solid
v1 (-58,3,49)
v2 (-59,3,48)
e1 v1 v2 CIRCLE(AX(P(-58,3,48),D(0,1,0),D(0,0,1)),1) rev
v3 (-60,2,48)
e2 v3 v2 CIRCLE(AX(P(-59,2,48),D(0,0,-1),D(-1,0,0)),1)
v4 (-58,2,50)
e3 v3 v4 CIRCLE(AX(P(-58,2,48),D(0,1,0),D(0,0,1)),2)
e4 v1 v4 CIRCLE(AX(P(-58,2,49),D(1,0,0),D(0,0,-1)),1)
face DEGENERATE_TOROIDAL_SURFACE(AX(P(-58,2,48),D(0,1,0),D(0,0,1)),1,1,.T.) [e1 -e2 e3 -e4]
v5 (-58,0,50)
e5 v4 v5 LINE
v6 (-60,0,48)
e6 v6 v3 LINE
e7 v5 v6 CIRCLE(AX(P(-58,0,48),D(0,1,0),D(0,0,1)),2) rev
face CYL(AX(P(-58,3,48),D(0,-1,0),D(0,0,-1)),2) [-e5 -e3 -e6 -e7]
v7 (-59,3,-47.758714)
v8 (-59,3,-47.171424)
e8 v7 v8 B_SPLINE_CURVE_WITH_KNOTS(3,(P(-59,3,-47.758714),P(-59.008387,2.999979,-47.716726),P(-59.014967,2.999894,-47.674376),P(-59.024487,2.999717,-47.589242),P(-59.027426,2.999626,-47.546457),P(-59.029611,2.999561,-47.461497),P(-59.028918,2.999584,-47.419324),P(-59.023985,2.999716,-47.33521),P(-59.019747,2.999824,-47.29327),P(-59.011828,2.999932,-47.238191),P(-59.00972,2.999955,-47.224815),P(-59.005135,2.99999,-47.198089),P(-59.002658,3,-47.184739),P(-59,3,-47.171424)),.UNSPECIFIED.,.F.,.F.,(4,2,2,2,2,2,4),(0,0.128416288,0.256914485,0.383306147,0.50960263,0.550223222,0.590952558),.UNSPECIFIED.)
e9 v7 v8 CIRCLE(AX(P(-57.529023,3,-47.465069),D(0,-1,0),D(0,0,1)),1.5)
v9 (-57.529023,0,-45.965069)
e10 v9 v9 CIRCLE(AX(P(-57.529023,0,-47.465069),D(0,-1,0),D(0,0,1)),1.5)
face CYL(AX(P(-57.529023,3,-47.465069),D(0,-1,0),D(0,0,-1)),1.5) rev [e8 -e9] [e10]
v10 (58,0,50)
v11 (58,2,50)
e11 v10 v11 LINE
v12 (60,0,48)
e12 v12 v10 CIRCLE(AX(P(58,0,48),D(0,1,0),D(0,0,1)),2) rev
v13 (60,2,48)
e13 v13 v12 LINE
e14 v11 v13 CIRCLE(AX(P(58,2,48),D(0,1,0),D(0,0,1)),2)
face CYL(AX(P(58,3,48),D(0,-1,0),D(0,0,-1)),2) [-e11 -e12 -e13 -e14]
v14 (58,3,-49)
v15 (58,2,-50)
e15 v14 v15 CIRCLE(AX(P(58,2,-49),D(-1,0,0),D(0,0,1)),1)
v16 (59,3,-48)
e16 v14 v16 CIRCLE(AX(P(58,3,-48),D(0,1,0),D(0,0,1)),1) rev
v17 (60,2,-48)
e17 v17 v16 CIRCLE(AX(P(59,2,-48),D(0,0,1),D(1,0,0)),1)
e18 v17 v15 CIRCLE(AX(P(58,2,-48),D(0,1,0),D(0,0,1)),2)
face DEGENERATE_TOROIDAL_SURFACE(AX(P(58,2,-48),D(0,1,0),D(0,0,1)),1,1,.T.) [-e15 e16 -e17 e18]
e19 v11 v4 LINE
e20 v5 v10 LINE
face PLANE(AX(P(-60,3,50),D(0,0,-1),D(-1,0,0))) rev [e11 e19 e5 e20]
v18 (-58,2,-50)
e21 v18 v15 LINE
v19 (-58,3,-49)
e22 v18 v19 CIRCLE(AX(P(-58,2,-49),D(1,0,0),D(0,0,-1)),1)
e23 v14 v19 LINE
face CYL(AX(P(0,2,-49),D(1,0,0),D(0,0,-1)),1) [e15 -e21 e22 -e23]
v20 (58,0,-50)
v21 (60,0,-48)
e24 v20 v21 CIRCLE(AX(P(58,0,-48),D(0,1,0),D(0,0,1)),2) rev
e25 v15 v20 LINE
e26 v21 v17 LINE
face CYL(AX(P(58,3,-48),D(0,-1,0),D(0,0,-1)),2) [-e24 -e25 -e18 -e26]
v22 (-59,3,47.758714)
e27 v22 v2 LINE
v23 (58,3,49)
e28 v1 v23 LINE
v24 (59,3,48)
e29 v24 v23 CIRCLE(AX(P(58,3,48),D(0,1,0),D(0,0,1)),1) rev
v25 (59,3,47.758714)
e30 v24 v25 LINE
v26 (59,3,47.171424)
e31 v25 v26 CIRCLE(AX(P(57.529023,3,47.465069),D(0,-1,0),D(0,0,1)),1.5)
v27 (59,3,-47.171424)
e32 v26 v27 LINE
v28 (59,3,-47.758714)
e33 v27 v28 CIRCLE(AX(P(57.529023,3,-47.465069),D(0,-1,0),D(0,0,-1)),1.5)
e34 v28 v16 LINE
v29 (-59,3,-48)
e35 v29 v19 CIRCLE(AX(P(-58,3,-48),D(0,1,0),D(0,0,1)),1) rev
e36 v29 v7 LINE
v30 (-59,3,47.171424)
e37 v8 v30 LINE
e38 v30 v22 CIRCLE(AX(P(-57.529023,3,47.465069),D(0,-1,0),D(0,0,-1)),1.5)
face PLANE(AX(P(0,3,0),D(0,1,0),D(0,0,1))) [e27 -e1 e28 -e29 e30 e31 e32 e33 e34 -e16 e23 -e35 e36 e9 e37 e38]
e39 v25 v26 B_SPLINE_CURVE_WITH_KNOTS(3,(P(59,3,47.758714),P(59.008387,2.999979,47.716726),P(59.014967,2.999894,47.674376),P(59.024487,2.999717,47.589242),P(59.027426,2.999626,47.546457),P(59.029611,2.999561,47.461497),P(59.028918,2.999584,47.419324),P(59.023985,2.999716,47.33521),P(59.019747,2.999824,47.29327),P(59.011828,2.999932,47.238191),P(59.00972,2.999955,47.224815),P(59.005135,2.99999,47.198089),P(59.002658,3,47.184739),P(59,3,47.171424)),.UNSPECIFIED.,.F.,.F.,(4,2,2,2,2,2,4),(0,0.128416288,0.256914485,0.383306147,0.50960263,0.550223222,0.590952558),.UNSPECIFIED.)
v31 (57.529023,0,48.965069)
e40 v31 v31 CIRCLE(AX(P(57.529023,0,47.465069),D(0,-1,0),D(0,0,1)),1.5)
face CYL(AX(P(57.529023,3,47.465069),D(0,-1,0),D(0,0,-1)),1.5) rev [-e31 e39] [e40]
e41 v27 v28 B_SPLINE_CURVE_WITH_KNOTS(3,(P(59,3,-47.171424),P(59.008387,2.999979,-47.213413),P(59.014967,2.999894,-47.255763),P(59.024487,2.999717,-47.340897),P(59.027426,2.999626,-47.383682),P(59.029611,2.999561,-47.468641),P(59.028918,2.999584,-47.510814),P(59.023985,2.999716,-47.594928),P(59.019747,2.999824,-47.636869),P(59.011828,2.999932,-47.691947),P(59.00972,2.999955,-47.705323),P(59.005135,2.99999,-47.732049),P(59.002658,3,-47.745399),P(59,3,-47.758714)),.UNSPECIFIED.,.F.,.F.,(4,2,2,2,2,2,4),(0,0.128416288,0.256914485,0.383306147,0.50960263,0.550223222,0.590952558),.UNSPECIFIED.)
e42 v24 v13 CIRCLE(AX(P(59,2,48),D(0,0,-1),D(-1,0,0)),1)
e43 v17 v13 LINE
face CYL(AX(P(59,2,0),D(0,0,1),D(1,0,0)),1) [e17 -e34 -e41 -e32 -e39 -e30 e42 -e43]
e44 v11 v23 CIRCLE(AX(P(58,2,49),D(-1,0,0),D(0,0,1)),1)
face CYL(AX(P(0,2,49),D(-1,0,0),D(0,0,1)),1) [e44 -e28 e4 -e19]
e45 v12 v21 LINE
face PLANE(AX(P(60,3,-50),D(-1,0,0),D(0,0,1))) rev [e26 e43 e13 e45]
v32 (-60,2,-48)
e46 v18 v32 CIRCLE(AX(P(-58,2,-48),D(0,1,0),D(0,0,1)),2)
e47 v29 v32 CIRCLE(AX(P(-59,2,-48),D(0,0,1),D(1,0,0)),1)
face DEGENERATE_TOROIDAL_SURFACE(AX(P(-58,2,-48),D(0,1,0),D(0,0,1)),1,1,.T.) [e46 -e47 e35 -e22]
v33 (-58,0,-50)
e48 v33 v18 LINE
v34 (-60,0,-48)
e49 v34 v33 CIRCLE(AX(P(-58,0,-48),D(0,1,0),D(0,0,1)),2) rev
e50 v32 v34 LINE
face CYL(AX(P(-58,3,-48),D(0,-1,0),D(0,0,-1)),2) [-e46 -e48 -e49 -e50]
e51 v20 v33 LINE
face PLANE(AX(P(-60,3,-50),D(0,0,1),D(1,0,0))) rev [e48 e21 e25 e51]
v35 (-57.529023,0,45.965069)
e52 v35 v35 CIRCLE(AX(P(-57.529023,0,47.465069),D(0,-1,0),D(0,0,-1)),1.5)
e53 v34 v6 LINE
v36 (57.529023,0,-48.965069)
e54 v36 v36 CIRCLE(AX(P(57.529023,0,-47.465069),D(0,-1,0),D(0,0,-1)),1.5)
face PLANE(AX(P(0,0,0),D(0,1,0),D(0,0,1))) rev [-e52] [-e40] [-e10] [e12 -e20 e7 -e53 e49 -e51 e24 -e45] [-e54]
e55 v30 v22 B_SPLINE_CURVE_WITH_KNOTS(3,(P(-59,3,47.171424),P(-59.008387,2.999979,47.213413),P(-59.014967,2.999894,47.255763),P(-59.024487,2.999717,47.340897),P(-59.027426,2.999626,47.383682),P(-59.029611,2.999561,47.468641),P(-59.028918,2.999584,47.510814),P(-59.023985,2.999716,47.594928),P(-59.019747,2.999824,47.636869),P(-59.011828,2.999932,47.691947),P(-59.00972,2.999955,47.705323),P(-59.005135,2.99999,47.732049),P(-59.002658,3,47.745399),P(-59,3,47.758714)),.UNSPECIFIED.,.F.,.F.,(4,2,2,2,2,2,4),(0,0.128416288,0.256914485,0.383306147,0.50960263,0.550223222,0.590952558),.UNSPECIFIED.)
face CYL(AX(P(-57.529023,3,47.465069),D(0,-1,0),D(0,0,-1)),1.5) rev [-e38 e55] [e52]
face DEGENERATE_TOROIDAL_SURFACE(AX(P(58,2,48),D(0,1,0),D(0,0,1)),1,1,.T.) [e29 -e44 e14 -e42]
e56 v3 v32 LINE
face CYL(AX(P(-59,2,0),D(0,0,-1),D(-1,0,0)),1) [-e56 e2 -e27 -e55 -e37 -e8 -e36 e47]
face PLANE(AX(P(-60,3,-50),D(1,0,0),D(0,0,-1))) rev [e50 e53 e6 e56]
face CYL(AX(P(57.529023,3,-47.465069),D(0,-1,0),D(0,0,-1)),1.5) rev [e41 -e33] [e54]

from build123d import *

# Parameters (mm, degrees)
SKETCH1_W           = 120
SKETCH1_H           = 100
BOSS_EXTRUDE1_DEPTH = 3
SKETCH2_R           = 1.5
CUT_EXTRUDE1_DEPTH  = 79.160092119
FILLET2_R           = 1
FILLET4_R           = 2


with BuildPart() as part:
    # Sketch1 → Boss-Extrude1 (new body)
    with BuildSketch(Plane(origin=(0, 0, 0), x_dir=(1, 0, 0), z_dir=(0, 1, 0))):
        Rectangle(SKETCH1_W, SKETCH1_H)
    extrude(amount=BOSS_EXTRUDE1_DEPTH)

    # Sketch2 → Cut-Extrude1 (cut, through all)
    with BuildSketch(Plane(origin=(0, 0, 0), x_dir=(-1, 0, 0), z_dir=(0, -1, 0))):
        with Locations(Location((57.529023281, -47.465069221, 0), (0, 0, 90))):
            Circle(SKETCH2_R)
        with Locations(Location((57.529023281, 47.465069221, 0), (0, 0, 270))):
            Circle(SKETCH2_R)
        with Locations(Location((-57.529023281, 47.465069221, 0), (0, 0, 90))):
            Circle(SKETCH2_R)
        with Locations(Location((-57.529023281, -47.465069221, 0), (0, 0, 270))):
            Circle(SKETCH2_R)
    extrude(amount=-CUT_EXTRUDE1_DEPTH, mode=Mode.SUBTRACT)

    # Fillet2
    fillet2_edges = [part.edges().sort_by_distance(p)[0] for p in [
        (-60, 3, 0),
        (0, 3, 50),
        (60, 3, 0),
        (0, 3, -50),
    ]]
    fillet(fillet2_edges, radius=FILLET2_R)

    # Fillet4
    # the kernel refuses this fillet: 2 mm, written as the material it takes off along each edge
    with BuildSketch(Plane(origin=(58, 3, -48), x_dir=(1, 0, 0), z_dir=(0, 0, 1))) as fillet4_piece_1:
        with BuildLine():
            CenterArc((1, -1), 1, 0, 90)
            Line((2, -1), (2, 0))
            Line((2, 0), (1, 0))
        make_face()
    revolve(axis=Axis((58, 3, -48), (0, 1, 0)), revolution_arc=90, mode=Mode.SUBTRACT)
    with BuildSketch(Plane(origin=(58, 3, 48), x_dir=(0, 0, 1), z_dir=(-1, 0, 0))) as fillet4_piece_2:
        with BuildLine():
            CenterArc((1, -1), 1, 0, 90)
            Line((2, -1), (2, 0))
            Line((2, 0), (1, 0))
        make_face()
    revolve(axis=Axis((58, 3, 48), (0, 1, 0)), revolution_arc=90, mode=Mode.SUBTRACT)
    with BuildSketch(Plane(origin=(-58, 3, -48), x_dir=(0, 0, -1), z_dir=(1, 0, 0))) as fillet4_piece_3:
        with BuildLine():
            CenterArc((1, -1), 1, 0, 90)
            Line((2, -1), (2, 0))
            Line((2, 0), (1, 0))
        make_face()
    revolve(axis=Axis((-58, 3, -48), (0, 1, 0)), revolution_arc=90, mode=Mode.SUBTRACT)
    with BuildSketch(Plane(origin=(-58, 3, 48), x_dir=(-1, 0, 0), z_dir=(0, 0, -1))) as fillet4_piece_4:
        with BuildLine():
            CenterArc((1, -1), 1, 0, 90)
            Line((2, -1), (2, 0))
            Line((2, 0), (1, 0))
        make_face()
    revolve(axis=Axis((-58, 3, 48), (0, 1, 0)), revolution_arc=90, mode=Mode.SUBTRACT)
    with BuildSketch(Plane(origin=(-60, -5, 50), x_dir=(0, 0, -1), z_dir=(0, 1, 0)), Plane(origin=(-60, -5, -50), x_dir=(1, 0, 0), z_dir=(0, 1, 0))) as fillet4_piece_5:
        with BuildLine():
            CenterArc((FILLET4_R, -FILLET4_R), FILLET4_R, 90, 90)
            Line((0, -FILLET4_R), (0, 0))
            Line((0, 0), (FILLET4_R, 0))
        make_face()
    extrude(amount=8, mode=Mode.SUBTRACT)
    with BuildSketch(Plane(origin=(60, -5, 50), x_dir=(0, 0, -1), z_dir=(0, 1, 0)), Plane(origin=(60, -5, -50), x_dir=(-1, 0, 0), z_dir=(0, 1, 0))) as fillet4_piece_6:
        with BuildLine():
            CenterArc((FILLET4_R, FILLET4_R), FILLET4_R, 180, 90)
            Line((0, FILLET4_R), (0, 0))
            Line((0, 0), (FILLET4_R, 0))
        make_face()
    extrude(amount=8, mode=Mode.SUBTRACT)


solid = part.part
